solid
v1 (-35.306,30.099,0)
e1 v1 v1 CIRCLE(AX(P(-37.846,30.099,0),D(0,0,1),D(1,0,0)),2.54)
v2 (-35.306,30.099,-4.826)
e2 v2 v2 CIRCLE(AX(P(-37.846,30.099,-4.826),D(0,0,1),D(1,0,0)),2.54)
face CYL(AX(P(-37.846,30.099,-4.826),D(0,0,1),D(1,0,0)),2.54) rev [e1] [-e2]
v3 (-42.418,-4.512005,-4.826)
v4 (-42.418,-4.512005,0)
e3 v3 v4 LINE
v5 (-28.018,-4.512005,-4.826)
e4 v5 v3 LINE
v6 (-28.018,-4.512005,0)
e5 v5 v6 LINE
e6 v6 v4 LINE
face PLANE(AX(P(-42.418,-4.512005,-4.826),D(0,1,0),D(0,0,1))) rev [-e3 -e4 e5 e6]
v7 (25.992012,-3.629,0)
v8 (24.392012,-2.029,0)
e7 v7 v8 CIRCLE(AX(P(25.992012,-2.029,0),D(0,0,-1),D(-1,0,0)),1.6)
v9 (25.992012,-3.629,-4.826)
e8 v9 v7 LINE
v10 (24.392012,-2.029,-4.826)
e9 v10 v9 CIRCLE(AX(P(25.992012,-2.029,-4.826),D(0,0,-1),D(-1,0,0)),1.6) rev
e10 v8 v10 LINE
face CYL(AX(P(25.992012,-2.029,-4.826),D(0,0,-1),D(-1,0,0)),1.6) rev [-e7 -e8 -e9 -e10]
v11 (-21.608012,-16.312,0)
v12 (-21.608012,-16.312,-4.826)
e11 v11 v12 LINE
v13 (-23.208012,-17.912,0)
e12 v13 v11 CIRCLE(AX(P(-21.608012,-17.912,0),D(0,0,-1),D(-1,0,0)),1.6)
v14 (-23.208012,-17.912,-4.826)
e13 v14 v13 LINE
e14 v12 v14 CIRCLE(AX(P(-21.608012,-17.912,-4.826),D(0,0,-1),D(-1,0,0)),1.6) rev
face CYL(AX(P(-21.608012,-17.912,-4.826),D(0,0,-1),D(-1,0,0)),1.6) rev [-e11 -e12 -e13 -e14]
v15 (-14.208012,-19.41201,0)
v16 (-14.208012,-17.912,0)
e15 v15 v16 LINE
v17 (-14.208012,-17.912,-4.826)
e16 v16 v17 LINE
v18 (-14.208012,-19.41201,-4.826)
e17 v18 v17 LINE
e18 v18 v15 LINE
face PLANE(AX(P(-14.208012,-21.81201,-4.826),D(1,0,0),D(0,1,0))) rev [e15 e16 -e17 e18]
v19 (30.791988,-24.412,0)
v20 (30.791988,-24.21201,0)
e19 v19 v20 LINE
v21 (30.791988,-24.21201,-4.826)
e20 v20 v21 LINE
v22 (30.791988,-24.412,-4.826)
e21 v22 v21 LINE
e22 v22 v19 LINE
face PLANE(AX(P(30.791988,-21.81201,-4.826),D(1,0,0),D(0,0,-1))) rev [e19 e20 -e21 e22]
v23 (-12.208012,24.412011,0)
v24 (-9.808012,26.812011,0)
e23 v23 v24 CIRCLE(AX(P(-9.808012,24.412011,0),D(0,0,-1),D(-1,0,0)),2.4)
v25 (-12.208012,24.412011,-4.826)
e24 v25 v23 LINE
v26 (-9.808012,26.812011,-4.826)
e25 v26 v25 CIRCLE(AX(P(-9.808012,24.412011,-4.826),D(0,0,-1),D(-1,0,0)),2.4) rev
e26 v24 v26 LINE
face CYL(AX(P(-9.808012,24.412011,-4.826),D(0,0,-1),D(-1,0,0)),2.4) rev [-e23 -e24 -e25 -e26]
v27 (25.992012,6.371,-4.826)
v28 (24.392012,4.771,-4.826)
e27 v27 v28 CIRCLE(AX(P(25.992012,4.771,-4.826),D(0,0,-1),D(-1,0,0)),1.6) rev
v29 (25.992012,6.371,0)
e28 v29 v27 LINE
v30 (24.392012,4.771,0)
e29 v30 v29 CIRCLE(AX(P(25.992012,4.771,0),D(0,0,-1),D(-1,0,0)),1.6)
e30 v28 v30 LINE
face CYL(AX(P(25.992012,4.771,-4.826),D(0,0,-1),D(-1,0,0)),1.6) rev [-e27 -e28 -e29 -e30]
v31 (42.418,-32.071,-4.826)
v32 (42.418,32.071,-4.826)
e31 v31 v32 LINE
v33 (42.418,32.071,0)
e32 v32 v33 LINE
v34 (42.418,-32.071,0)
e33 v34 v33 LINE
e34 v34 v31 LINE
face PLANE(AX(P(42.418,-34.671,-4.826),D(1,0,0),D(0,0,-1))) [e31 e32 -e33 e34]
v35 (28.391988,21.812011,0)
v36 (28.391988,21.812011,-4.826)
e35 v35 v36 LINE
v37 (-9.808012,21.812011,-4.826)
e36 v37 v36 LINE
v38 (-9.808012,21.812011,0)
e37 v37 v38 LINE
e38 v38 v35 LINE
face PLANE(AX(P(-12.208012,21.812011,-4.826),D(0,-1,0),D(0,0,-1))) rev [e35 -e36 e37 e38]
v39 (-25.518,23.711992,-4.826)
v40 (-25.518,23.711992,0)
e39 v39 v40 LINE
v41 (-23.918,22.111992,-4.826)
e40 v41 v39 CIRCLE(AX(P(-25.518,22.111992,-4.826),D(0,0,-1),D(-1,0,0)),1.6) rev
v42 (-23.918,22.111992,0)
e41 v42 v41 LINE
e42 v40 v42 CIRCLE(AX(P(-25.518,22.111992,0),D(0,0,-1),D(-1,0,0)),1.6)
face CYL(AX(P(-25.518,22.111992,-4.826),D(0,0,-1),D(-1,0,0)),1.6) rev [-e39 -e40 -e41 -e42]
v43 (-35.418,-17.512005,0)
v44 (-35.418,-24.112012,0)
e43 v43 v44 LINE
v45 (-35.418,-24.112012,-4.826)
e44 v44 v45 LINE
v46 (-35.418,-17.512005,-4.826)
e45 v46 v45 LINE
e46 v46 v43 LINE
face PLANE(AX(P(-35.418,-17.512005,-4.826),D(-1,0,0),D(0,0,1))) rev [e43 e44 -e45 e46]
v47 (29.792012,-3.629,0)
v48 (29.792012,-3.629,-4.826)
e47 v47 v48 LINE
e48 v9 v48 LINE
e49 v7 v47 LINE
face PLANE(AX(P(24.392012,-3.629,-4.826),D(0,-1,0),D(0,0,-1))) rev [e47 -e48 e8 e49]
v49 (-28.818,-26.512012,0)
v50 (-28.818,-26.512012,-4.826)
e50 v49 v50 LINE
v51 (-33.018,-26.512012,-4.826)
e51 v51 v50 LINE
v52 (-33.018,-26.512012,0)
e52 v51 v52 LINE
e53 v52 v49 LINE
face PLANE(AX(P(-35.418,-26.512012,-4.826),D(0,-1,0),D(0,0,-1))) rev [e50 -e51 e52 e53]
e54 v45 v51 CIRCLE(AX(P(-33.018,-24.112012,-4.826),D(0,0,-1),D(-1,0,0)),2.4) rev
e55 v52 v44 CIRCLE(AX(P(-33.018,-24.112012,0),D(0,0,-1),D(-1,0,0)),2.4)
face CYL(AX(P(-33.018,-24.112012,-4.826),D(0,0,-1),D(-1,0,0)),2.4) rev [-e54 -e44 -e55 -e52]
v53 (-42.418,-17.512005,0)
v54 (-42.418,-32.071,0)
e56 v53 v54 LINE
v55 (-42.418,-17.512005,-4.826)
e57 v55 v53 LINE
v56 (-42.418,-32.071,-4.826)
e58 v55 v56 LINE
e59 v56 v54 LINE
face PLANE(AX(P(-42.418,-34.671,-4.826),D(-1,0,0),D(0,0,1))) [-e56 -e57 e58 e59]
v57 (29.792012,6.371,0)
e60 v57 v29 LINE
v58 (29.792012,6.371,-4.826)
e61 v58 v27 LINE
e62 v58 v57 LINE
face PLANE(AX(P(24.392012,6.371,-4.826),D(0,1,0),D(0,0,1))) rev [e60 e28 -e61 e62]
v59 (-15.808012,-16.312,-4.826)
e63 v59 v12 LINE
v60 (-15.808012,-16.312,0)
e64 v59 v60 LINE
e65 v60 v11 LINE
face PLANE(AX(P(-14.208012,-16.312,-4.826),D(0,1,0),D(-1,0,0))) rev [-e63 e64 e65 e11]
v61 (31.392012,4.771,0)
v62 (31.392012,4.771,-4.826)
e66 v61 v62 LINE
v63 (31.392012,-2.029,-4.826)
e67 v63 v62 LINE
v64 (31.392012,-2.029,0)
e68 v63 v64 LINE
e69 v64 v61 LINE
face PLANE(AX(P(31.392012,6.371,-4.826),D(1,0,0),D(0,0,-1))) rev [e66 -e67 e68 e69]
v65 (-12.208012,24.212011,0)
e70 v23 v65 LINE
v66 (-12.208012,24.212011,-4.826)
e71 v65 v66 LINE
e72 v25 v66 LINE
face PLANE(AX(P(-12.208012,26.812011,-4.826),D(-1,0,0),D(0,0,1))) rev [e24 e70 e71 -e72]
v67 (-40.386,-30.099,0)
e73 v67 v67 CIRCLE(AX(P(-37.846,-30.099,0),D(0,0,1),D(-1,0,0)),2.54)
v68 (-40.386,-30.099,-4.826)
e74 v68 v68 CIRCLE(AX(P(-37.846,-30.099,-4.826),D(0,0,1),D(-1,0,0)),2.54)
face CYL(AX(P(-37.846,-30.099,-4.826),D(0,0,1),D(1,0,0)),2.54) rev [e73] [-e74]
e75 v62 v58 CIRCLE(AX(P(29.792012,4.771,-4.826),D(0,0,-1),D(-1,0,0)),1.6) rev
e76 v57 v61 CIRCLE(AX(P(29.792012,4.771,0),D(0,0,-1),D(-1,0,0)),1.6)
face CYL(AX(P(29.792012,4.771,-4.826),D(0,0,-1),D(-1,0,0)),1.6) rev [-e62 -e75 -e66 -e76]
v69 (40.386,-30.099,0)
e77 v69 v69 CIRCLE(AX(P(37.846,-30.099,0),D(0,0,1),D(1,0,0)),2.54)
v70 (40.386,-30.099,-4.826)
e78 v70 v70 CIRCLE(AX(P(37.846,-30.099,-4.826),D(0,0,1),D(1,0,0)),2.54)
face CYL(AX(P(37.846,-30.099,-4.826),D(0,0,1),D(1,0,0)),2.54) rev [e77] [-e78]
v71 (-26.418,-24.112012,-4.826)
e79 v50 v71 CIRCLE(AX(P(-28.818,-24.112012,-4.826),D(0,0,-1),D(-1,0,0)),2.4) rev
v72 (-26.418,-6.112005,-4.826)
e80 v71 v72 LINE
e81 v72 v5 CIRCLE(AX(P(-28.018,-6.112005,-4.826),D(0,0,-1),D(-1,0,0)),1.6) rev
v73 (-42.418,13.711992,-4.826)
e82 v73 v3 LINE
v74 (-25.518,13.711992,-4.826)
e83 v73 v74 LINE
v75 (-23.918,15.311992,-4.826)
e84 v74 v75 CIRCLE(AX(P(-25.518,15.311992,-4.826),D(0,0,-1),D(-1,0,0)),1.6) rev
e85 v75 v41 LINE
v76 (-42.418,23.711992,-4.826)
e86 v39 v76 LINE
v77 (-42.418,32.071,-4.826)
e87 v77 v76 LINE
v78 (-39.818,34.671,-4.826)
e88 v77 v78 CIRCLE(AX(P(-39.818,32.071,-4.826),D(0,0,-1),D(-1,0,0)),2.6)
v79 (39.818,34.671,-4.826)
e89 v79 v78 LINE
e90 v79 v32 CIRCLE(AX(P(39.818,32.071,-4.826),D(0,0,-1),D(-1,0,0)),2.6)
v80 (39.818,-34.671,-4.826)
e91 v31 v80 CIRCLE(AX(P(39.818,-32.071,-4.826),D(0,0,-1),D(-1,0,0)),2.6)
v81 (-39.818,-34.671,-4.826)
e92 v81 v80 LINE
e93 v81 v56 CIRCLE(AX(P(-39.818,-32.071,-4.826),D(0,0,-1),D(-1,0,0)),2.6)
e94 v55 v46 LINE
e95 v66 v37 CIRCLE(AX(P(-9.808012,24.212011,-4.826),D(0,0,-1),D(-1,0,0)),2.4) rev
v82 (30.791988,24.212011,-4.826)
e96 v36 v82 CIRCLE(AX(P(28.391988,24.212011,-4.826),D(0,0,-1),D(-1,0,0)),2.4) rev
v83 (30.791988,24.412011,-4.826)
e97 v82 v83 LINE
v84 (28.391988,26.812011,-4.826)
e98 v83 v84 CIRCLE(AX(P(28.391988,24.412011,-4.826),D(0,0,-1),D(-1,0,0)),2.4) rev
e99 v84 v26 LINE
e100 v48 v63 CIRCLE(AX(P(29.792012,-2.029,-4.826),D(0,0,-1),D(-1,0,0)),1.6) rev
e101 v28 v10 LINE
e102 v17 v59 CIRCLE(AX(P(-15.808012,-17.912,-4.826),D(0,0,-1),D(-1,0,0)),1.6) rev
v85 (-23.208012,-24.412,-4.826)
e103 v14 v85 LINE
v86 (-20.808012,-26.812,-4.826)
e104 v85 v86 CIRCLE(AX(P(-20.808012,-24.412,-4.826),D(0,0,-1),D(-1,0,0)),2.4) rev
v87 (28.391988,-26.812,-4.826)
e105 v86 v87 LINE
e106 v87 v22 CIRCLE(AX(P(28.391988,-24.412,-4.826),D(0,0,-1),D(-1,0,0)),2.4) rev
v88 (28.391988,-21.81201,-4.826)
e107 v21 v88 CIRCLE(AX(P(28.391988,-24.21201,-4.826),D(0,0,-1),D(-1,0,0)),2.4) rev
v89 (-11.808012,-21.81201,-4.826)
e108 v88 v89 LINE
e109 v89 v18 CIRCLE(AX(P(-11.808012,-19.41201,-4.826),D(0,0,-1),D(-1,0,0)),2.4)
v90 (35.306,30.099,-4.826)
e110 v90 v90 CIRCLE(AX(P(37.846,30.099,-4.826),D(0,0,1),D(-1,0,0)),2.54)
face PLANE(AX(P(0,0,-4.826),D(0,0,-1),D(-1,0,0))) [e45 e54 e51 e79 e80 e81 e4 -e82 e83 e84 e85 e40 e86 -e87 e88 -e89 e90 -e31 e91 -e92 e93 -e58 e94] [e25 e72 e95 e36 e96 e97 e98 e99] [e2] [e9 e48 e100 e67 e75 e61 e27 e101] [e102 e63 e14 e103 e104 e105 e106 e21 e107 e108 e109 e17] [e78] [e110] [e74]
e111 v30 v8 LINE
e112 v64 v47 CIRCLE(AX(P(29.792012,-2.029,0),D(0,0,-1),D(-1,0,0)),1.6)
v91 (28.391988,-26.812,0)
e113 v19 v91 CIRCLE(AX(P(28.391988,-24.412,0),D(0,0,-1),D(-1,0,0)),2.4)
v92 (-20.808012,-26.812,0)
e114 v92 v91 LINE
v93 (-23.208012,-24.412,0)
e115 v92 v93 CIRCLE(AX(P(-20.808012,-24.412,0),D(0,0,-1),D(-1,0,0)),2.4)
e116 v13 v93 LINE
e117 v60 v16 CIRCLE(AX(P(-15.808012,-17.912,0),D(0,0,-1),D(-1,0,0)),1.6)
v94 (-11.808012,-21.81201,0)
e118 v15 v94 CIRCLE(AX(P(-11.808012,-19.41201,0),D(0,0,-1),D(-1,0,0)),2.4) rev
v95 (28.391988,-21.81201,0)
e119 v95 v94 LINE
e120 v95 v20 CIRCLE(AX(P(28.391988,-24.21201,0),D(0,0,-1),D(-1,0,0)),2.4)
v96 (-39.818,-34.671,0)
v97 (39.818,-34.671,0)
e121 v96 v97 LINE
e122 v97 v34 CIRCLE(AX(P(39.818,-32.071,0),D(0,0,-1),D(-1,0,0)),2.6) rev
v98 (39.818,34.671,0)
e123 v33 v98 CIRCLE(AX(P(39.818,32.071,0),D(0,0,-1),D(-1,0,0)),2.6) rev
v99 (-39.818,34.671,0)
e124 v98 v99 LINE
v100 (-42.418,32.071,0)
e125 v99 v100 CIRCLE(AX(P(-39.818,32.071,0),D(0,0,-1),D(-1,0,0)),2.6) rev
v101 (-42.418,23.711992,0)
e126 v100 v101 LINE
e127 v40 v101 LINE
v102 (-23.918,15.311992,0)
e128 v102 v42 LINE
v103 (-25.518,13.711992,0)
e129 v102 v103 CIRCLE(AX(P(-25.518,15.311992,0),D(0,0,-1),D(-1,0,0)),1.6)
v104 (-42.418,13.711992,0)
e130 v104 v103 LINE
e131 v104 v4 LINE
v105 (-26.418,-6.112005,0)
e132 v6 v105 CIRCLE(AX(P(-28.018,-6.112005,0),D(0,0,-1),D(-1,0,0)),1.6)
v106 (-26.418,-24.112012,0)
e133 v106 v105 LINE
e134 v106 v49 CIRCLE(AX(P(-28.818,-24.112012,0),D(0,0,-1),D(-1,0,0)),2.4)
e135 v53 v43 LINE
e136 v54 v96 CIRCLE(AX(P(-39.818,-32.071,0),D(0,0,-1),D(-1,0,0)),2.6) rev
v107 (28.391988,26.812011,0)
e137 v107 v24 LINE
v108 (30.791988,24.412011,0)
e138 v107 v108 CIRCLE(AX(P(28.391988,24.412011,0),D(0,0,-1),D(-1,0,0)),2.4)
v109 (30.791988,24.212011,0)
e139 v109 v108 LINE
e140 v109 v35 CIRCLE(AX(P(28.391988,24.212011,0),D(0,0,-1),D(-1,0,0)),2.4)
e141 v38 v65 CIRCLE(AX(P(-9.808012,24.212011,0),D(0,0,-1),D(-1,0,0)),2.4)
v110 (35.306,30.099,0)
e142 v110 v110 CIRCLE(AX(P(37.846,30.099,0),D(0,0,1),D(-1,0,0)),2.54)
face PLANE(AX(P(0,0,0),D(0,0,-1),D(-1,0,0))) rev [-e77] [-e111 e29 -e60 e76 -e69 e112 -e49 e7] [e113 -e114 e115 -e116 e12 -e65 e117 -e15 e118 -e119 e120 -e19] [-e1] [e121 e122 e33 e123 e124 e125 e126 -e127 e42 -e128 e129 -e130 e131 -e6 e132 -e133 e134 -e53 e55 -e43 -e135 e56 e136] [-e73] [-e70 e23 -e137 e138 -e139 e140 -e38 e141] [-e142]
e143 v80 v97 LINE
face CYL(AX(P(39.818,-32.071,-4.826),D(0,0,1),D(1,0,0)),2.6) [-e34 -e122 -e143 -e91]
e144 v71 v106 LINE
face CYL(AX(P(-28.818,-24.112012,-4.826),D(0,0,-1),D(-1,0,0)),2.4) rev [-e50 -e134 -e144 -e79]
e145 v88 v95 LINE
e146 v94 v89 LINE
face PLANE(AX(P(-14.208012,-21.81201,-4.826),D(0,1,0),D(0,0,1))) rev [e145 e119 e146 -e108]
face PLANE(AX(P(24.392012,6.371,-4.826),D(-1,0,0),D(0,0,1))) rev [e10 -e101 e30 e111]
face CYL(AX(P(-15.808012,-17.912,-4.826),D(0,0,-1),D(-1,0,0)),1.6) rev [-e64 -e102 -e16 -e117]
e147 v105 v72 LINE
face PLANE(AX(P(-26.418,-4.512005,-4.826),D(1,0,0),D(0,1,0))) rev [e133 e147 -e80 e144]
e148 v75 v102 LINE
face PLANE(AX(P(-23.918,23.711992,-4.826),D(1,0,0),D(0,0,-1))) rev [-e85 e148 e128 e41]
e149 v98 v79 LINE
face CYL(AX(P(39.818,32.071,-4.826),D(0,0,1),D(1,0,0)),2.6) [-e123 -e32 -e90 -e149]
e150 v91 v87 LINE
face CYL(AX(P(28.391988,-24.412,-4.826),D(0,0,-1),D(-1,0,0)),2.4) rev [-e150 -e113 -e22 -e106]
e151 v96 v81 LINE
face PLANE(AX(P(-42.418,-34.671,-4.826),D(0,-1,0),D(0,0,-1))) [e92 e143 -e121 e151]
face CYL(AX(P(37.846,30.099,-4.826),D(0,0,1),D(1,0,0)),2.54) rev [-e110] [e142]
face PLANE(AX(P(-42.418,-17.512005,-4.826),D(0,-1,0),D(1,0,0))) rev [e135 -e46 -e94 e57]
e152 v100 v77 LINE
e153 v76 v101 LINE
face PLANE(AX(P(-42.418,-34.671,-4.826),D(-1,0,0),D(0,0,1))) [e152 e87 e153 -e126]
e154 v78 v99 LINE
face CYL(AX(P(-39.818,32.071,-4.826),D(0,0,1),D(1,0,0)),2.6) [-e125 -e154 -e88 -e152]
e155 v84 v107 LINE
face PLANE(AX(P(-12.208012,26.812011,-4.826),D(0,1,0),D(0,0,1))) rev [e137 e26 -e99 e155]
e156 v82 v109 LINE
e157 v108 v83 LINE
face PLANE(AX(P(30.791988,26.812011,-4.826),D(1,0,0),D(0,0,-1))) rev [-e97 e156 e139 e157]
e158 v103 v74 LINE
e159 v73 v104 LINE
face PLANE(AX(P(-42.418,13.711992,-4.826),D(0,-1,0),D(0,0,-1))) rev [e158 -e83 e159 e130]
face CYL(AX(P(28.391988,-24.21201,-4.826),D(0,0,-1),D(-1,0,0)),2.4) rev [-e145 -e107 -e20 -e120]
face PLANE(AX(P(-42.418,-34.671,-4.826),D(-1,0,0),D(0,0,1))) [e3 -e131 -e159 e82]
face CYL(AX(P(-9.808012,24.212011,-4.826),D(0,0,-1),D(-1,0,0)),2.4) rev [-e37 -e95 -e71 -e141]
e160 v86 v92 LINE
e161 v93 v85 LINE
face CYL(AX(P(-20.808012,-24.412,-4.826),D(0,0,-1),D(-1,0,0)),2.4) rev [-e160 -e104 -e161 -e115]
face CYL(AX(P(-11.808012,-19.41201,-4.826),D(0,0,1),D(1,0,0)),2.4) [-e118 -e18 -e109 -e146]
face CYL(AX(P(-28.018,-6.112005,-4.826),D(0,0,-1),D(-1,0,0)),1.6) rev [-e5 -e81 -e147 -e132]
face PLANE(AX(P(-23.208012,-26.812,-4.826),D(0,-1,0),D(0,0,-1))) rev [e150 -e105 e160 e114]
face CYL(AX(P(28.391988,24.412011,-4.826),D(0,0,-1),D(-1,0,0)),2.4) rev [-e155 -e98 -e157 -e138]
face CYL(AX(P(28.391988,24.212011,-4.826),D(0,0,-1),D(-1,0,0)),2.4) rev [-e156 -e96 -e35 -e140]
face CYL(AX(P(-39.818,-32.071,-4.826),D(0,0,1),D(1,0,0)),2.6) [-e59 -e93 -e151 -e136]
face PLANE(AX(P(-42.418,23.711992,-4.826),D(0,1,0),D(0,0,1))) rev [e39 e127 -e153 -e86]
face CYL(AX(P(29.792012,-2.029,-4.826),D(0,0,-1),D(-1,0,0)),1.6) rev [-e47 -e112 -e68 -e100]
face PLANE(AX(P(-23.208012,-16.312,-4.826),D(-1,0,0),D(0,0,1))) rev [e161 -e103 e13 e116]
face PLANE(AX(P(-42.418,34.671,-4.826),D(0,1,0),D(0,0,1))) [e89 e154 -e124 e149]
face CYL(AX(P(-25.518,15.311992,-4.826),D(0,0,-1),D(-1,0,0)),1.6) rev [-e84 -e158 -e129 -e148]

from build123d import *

# Parameters (mm, degrees)
SKETCH1_W          = 84.836
SKETCH1_H          = 69.342
BASE_FLANGE1_DEPTH = 4.826
SKETCH6_R          = 2.54
CUT_EXTRUDE1_DEPTH = 10
FILLET1_R          = 2.6
SKETCH7_W          = 18.5
SKETCH7_H          = 10
SKETCH7_W_2        = 43
SKETCH7_H_2        = 5
SKETCH7_W_3        = 7
CUT_EXTRUDE2_DEPTH = 4.826
FILLET2_R          = 2.4
FILLET3_R          = 1.6


# Sheet-metal steps are written as plain solids
with BuildPart() as part:
    # Sketch1 → Base-Flange1 (new body)
    with BuildSketch(Plane.XY):
        Rectangle(SKETCH1_W, SKETCH1_H)
    extrude(amount=-BASE_FLANGE1_DEPTH)

    # Sketch6 → Cut-Extrude1 (cut)
    with BuildSketch(Plane.XY):
        with Locations((-37.846, 30.099)):
            Circle(SKETCH6_R)
        with Locations(Location((-37.846, -30.099, 0), (0, 0, 180))):
            Circle(SKETCH6_R)
        with Locations((37.846, -30.099)):
            Circle(SKETCH6_R)
        with Locations(Location((37.846, 30.099, 0), (0, 0, 180))):
            Circle(SKETCH6_R)
    extrude(amount=-CUT_EXTRUDE1_DEPTH, mode=Mode.SUBTRACT)

    # Fillet1
    fillet1_edges = [part.edges().sort_by_distance(p)[0] for p in [
        (-42.418, 34.671, -2.413),
        (42.418, 34.671, -2.413),
        (42.418, -34.671, -2.413),
        (-42.418, -34.671, -2.413),
    ]]
    fillet(fillet1_edges, radius=FILLET1_R)

    # Sketch7 → Cut-Extrude2 (cut)
    with BuildSketch(Plane.XY):
        with Locations((-33.168, 18.7119922)):
            Rectangle(SKETCH7_W, SKETCH7_H)
        Polygon((-42.418, -4.5120046), (-26.418, -4.5120046), (-26.418, -26.512012), (-35.418, -26.512012), (-35.418, -17.5120046), (-42.418, -17.5120046), align=None)
        with Locations((9.2919882, 24.3120114)):
            Rectangle(SKETCH7_W_2, SKETCH7_H_2)
        Polygon((-14.2080118, -21.81200997), (-14.2080118, -16.31199997), (-23.2080118, -16.31199997), (-23.2080118, -26.81199997), (30.7919882, -26.81199997), (30.7919882, -21.81200997), align=None)
        with Locations((27.8920124, 1.371)):
            Rectangle(SKETCH7_W_3, SKETCH7_H)
    extrude(amount=-CUT_EXTRUDE2_DEPTH, mode=Mode.SUBTRACT)

    # Fillet2
    fillet2_edges = [part.edges().sort_by_distance(p)[0] for p in [
        (-12.2080118, 21.8120114, -2.413),
        (-12.2080118, 26.8120114, -2.413),
        (30.7919882, 26.8120114, -2.413),
        (30.7919882, 21.8120114, -2.413),
        (30.7919882, -21.81200997, -2.413),
        (30.7919882, -26.81199997, -2.413),
        (-23.2080118, -26.81199997, -2.413),
        (-14.2080118, -21.81200997, -2.413),
        (-26.418, -26.512012, -2.413),
        (-35.418, -26.512012, -2.413),
    ]]
    fillet(fillet2_edges, radius=FILLET2_R)

    # Fillet3
    fillet3_edges = [part.edges().sort_by_distance(p)[0] for p in [
        (24.3920124, -3.629, -2.413),
        (24.3920124, 6.371, -2.413),
        (31.3920124, 6.371, -2.413),
        (31.3920124, -3.629, -2.413),
        (-23.2080118, -16.31199997, -2.413),
        (-14.2080118, -16.31199997, -2.413),
        (-23.918, 23.7119922, -2.413),
        (-23.918, 13.7119922, -2.413),
        (-26.418, -4.5120046, -2.413),
    ]]
    fillet(fillet3_edges, radius=FILLET3_R)


solid = part.part
